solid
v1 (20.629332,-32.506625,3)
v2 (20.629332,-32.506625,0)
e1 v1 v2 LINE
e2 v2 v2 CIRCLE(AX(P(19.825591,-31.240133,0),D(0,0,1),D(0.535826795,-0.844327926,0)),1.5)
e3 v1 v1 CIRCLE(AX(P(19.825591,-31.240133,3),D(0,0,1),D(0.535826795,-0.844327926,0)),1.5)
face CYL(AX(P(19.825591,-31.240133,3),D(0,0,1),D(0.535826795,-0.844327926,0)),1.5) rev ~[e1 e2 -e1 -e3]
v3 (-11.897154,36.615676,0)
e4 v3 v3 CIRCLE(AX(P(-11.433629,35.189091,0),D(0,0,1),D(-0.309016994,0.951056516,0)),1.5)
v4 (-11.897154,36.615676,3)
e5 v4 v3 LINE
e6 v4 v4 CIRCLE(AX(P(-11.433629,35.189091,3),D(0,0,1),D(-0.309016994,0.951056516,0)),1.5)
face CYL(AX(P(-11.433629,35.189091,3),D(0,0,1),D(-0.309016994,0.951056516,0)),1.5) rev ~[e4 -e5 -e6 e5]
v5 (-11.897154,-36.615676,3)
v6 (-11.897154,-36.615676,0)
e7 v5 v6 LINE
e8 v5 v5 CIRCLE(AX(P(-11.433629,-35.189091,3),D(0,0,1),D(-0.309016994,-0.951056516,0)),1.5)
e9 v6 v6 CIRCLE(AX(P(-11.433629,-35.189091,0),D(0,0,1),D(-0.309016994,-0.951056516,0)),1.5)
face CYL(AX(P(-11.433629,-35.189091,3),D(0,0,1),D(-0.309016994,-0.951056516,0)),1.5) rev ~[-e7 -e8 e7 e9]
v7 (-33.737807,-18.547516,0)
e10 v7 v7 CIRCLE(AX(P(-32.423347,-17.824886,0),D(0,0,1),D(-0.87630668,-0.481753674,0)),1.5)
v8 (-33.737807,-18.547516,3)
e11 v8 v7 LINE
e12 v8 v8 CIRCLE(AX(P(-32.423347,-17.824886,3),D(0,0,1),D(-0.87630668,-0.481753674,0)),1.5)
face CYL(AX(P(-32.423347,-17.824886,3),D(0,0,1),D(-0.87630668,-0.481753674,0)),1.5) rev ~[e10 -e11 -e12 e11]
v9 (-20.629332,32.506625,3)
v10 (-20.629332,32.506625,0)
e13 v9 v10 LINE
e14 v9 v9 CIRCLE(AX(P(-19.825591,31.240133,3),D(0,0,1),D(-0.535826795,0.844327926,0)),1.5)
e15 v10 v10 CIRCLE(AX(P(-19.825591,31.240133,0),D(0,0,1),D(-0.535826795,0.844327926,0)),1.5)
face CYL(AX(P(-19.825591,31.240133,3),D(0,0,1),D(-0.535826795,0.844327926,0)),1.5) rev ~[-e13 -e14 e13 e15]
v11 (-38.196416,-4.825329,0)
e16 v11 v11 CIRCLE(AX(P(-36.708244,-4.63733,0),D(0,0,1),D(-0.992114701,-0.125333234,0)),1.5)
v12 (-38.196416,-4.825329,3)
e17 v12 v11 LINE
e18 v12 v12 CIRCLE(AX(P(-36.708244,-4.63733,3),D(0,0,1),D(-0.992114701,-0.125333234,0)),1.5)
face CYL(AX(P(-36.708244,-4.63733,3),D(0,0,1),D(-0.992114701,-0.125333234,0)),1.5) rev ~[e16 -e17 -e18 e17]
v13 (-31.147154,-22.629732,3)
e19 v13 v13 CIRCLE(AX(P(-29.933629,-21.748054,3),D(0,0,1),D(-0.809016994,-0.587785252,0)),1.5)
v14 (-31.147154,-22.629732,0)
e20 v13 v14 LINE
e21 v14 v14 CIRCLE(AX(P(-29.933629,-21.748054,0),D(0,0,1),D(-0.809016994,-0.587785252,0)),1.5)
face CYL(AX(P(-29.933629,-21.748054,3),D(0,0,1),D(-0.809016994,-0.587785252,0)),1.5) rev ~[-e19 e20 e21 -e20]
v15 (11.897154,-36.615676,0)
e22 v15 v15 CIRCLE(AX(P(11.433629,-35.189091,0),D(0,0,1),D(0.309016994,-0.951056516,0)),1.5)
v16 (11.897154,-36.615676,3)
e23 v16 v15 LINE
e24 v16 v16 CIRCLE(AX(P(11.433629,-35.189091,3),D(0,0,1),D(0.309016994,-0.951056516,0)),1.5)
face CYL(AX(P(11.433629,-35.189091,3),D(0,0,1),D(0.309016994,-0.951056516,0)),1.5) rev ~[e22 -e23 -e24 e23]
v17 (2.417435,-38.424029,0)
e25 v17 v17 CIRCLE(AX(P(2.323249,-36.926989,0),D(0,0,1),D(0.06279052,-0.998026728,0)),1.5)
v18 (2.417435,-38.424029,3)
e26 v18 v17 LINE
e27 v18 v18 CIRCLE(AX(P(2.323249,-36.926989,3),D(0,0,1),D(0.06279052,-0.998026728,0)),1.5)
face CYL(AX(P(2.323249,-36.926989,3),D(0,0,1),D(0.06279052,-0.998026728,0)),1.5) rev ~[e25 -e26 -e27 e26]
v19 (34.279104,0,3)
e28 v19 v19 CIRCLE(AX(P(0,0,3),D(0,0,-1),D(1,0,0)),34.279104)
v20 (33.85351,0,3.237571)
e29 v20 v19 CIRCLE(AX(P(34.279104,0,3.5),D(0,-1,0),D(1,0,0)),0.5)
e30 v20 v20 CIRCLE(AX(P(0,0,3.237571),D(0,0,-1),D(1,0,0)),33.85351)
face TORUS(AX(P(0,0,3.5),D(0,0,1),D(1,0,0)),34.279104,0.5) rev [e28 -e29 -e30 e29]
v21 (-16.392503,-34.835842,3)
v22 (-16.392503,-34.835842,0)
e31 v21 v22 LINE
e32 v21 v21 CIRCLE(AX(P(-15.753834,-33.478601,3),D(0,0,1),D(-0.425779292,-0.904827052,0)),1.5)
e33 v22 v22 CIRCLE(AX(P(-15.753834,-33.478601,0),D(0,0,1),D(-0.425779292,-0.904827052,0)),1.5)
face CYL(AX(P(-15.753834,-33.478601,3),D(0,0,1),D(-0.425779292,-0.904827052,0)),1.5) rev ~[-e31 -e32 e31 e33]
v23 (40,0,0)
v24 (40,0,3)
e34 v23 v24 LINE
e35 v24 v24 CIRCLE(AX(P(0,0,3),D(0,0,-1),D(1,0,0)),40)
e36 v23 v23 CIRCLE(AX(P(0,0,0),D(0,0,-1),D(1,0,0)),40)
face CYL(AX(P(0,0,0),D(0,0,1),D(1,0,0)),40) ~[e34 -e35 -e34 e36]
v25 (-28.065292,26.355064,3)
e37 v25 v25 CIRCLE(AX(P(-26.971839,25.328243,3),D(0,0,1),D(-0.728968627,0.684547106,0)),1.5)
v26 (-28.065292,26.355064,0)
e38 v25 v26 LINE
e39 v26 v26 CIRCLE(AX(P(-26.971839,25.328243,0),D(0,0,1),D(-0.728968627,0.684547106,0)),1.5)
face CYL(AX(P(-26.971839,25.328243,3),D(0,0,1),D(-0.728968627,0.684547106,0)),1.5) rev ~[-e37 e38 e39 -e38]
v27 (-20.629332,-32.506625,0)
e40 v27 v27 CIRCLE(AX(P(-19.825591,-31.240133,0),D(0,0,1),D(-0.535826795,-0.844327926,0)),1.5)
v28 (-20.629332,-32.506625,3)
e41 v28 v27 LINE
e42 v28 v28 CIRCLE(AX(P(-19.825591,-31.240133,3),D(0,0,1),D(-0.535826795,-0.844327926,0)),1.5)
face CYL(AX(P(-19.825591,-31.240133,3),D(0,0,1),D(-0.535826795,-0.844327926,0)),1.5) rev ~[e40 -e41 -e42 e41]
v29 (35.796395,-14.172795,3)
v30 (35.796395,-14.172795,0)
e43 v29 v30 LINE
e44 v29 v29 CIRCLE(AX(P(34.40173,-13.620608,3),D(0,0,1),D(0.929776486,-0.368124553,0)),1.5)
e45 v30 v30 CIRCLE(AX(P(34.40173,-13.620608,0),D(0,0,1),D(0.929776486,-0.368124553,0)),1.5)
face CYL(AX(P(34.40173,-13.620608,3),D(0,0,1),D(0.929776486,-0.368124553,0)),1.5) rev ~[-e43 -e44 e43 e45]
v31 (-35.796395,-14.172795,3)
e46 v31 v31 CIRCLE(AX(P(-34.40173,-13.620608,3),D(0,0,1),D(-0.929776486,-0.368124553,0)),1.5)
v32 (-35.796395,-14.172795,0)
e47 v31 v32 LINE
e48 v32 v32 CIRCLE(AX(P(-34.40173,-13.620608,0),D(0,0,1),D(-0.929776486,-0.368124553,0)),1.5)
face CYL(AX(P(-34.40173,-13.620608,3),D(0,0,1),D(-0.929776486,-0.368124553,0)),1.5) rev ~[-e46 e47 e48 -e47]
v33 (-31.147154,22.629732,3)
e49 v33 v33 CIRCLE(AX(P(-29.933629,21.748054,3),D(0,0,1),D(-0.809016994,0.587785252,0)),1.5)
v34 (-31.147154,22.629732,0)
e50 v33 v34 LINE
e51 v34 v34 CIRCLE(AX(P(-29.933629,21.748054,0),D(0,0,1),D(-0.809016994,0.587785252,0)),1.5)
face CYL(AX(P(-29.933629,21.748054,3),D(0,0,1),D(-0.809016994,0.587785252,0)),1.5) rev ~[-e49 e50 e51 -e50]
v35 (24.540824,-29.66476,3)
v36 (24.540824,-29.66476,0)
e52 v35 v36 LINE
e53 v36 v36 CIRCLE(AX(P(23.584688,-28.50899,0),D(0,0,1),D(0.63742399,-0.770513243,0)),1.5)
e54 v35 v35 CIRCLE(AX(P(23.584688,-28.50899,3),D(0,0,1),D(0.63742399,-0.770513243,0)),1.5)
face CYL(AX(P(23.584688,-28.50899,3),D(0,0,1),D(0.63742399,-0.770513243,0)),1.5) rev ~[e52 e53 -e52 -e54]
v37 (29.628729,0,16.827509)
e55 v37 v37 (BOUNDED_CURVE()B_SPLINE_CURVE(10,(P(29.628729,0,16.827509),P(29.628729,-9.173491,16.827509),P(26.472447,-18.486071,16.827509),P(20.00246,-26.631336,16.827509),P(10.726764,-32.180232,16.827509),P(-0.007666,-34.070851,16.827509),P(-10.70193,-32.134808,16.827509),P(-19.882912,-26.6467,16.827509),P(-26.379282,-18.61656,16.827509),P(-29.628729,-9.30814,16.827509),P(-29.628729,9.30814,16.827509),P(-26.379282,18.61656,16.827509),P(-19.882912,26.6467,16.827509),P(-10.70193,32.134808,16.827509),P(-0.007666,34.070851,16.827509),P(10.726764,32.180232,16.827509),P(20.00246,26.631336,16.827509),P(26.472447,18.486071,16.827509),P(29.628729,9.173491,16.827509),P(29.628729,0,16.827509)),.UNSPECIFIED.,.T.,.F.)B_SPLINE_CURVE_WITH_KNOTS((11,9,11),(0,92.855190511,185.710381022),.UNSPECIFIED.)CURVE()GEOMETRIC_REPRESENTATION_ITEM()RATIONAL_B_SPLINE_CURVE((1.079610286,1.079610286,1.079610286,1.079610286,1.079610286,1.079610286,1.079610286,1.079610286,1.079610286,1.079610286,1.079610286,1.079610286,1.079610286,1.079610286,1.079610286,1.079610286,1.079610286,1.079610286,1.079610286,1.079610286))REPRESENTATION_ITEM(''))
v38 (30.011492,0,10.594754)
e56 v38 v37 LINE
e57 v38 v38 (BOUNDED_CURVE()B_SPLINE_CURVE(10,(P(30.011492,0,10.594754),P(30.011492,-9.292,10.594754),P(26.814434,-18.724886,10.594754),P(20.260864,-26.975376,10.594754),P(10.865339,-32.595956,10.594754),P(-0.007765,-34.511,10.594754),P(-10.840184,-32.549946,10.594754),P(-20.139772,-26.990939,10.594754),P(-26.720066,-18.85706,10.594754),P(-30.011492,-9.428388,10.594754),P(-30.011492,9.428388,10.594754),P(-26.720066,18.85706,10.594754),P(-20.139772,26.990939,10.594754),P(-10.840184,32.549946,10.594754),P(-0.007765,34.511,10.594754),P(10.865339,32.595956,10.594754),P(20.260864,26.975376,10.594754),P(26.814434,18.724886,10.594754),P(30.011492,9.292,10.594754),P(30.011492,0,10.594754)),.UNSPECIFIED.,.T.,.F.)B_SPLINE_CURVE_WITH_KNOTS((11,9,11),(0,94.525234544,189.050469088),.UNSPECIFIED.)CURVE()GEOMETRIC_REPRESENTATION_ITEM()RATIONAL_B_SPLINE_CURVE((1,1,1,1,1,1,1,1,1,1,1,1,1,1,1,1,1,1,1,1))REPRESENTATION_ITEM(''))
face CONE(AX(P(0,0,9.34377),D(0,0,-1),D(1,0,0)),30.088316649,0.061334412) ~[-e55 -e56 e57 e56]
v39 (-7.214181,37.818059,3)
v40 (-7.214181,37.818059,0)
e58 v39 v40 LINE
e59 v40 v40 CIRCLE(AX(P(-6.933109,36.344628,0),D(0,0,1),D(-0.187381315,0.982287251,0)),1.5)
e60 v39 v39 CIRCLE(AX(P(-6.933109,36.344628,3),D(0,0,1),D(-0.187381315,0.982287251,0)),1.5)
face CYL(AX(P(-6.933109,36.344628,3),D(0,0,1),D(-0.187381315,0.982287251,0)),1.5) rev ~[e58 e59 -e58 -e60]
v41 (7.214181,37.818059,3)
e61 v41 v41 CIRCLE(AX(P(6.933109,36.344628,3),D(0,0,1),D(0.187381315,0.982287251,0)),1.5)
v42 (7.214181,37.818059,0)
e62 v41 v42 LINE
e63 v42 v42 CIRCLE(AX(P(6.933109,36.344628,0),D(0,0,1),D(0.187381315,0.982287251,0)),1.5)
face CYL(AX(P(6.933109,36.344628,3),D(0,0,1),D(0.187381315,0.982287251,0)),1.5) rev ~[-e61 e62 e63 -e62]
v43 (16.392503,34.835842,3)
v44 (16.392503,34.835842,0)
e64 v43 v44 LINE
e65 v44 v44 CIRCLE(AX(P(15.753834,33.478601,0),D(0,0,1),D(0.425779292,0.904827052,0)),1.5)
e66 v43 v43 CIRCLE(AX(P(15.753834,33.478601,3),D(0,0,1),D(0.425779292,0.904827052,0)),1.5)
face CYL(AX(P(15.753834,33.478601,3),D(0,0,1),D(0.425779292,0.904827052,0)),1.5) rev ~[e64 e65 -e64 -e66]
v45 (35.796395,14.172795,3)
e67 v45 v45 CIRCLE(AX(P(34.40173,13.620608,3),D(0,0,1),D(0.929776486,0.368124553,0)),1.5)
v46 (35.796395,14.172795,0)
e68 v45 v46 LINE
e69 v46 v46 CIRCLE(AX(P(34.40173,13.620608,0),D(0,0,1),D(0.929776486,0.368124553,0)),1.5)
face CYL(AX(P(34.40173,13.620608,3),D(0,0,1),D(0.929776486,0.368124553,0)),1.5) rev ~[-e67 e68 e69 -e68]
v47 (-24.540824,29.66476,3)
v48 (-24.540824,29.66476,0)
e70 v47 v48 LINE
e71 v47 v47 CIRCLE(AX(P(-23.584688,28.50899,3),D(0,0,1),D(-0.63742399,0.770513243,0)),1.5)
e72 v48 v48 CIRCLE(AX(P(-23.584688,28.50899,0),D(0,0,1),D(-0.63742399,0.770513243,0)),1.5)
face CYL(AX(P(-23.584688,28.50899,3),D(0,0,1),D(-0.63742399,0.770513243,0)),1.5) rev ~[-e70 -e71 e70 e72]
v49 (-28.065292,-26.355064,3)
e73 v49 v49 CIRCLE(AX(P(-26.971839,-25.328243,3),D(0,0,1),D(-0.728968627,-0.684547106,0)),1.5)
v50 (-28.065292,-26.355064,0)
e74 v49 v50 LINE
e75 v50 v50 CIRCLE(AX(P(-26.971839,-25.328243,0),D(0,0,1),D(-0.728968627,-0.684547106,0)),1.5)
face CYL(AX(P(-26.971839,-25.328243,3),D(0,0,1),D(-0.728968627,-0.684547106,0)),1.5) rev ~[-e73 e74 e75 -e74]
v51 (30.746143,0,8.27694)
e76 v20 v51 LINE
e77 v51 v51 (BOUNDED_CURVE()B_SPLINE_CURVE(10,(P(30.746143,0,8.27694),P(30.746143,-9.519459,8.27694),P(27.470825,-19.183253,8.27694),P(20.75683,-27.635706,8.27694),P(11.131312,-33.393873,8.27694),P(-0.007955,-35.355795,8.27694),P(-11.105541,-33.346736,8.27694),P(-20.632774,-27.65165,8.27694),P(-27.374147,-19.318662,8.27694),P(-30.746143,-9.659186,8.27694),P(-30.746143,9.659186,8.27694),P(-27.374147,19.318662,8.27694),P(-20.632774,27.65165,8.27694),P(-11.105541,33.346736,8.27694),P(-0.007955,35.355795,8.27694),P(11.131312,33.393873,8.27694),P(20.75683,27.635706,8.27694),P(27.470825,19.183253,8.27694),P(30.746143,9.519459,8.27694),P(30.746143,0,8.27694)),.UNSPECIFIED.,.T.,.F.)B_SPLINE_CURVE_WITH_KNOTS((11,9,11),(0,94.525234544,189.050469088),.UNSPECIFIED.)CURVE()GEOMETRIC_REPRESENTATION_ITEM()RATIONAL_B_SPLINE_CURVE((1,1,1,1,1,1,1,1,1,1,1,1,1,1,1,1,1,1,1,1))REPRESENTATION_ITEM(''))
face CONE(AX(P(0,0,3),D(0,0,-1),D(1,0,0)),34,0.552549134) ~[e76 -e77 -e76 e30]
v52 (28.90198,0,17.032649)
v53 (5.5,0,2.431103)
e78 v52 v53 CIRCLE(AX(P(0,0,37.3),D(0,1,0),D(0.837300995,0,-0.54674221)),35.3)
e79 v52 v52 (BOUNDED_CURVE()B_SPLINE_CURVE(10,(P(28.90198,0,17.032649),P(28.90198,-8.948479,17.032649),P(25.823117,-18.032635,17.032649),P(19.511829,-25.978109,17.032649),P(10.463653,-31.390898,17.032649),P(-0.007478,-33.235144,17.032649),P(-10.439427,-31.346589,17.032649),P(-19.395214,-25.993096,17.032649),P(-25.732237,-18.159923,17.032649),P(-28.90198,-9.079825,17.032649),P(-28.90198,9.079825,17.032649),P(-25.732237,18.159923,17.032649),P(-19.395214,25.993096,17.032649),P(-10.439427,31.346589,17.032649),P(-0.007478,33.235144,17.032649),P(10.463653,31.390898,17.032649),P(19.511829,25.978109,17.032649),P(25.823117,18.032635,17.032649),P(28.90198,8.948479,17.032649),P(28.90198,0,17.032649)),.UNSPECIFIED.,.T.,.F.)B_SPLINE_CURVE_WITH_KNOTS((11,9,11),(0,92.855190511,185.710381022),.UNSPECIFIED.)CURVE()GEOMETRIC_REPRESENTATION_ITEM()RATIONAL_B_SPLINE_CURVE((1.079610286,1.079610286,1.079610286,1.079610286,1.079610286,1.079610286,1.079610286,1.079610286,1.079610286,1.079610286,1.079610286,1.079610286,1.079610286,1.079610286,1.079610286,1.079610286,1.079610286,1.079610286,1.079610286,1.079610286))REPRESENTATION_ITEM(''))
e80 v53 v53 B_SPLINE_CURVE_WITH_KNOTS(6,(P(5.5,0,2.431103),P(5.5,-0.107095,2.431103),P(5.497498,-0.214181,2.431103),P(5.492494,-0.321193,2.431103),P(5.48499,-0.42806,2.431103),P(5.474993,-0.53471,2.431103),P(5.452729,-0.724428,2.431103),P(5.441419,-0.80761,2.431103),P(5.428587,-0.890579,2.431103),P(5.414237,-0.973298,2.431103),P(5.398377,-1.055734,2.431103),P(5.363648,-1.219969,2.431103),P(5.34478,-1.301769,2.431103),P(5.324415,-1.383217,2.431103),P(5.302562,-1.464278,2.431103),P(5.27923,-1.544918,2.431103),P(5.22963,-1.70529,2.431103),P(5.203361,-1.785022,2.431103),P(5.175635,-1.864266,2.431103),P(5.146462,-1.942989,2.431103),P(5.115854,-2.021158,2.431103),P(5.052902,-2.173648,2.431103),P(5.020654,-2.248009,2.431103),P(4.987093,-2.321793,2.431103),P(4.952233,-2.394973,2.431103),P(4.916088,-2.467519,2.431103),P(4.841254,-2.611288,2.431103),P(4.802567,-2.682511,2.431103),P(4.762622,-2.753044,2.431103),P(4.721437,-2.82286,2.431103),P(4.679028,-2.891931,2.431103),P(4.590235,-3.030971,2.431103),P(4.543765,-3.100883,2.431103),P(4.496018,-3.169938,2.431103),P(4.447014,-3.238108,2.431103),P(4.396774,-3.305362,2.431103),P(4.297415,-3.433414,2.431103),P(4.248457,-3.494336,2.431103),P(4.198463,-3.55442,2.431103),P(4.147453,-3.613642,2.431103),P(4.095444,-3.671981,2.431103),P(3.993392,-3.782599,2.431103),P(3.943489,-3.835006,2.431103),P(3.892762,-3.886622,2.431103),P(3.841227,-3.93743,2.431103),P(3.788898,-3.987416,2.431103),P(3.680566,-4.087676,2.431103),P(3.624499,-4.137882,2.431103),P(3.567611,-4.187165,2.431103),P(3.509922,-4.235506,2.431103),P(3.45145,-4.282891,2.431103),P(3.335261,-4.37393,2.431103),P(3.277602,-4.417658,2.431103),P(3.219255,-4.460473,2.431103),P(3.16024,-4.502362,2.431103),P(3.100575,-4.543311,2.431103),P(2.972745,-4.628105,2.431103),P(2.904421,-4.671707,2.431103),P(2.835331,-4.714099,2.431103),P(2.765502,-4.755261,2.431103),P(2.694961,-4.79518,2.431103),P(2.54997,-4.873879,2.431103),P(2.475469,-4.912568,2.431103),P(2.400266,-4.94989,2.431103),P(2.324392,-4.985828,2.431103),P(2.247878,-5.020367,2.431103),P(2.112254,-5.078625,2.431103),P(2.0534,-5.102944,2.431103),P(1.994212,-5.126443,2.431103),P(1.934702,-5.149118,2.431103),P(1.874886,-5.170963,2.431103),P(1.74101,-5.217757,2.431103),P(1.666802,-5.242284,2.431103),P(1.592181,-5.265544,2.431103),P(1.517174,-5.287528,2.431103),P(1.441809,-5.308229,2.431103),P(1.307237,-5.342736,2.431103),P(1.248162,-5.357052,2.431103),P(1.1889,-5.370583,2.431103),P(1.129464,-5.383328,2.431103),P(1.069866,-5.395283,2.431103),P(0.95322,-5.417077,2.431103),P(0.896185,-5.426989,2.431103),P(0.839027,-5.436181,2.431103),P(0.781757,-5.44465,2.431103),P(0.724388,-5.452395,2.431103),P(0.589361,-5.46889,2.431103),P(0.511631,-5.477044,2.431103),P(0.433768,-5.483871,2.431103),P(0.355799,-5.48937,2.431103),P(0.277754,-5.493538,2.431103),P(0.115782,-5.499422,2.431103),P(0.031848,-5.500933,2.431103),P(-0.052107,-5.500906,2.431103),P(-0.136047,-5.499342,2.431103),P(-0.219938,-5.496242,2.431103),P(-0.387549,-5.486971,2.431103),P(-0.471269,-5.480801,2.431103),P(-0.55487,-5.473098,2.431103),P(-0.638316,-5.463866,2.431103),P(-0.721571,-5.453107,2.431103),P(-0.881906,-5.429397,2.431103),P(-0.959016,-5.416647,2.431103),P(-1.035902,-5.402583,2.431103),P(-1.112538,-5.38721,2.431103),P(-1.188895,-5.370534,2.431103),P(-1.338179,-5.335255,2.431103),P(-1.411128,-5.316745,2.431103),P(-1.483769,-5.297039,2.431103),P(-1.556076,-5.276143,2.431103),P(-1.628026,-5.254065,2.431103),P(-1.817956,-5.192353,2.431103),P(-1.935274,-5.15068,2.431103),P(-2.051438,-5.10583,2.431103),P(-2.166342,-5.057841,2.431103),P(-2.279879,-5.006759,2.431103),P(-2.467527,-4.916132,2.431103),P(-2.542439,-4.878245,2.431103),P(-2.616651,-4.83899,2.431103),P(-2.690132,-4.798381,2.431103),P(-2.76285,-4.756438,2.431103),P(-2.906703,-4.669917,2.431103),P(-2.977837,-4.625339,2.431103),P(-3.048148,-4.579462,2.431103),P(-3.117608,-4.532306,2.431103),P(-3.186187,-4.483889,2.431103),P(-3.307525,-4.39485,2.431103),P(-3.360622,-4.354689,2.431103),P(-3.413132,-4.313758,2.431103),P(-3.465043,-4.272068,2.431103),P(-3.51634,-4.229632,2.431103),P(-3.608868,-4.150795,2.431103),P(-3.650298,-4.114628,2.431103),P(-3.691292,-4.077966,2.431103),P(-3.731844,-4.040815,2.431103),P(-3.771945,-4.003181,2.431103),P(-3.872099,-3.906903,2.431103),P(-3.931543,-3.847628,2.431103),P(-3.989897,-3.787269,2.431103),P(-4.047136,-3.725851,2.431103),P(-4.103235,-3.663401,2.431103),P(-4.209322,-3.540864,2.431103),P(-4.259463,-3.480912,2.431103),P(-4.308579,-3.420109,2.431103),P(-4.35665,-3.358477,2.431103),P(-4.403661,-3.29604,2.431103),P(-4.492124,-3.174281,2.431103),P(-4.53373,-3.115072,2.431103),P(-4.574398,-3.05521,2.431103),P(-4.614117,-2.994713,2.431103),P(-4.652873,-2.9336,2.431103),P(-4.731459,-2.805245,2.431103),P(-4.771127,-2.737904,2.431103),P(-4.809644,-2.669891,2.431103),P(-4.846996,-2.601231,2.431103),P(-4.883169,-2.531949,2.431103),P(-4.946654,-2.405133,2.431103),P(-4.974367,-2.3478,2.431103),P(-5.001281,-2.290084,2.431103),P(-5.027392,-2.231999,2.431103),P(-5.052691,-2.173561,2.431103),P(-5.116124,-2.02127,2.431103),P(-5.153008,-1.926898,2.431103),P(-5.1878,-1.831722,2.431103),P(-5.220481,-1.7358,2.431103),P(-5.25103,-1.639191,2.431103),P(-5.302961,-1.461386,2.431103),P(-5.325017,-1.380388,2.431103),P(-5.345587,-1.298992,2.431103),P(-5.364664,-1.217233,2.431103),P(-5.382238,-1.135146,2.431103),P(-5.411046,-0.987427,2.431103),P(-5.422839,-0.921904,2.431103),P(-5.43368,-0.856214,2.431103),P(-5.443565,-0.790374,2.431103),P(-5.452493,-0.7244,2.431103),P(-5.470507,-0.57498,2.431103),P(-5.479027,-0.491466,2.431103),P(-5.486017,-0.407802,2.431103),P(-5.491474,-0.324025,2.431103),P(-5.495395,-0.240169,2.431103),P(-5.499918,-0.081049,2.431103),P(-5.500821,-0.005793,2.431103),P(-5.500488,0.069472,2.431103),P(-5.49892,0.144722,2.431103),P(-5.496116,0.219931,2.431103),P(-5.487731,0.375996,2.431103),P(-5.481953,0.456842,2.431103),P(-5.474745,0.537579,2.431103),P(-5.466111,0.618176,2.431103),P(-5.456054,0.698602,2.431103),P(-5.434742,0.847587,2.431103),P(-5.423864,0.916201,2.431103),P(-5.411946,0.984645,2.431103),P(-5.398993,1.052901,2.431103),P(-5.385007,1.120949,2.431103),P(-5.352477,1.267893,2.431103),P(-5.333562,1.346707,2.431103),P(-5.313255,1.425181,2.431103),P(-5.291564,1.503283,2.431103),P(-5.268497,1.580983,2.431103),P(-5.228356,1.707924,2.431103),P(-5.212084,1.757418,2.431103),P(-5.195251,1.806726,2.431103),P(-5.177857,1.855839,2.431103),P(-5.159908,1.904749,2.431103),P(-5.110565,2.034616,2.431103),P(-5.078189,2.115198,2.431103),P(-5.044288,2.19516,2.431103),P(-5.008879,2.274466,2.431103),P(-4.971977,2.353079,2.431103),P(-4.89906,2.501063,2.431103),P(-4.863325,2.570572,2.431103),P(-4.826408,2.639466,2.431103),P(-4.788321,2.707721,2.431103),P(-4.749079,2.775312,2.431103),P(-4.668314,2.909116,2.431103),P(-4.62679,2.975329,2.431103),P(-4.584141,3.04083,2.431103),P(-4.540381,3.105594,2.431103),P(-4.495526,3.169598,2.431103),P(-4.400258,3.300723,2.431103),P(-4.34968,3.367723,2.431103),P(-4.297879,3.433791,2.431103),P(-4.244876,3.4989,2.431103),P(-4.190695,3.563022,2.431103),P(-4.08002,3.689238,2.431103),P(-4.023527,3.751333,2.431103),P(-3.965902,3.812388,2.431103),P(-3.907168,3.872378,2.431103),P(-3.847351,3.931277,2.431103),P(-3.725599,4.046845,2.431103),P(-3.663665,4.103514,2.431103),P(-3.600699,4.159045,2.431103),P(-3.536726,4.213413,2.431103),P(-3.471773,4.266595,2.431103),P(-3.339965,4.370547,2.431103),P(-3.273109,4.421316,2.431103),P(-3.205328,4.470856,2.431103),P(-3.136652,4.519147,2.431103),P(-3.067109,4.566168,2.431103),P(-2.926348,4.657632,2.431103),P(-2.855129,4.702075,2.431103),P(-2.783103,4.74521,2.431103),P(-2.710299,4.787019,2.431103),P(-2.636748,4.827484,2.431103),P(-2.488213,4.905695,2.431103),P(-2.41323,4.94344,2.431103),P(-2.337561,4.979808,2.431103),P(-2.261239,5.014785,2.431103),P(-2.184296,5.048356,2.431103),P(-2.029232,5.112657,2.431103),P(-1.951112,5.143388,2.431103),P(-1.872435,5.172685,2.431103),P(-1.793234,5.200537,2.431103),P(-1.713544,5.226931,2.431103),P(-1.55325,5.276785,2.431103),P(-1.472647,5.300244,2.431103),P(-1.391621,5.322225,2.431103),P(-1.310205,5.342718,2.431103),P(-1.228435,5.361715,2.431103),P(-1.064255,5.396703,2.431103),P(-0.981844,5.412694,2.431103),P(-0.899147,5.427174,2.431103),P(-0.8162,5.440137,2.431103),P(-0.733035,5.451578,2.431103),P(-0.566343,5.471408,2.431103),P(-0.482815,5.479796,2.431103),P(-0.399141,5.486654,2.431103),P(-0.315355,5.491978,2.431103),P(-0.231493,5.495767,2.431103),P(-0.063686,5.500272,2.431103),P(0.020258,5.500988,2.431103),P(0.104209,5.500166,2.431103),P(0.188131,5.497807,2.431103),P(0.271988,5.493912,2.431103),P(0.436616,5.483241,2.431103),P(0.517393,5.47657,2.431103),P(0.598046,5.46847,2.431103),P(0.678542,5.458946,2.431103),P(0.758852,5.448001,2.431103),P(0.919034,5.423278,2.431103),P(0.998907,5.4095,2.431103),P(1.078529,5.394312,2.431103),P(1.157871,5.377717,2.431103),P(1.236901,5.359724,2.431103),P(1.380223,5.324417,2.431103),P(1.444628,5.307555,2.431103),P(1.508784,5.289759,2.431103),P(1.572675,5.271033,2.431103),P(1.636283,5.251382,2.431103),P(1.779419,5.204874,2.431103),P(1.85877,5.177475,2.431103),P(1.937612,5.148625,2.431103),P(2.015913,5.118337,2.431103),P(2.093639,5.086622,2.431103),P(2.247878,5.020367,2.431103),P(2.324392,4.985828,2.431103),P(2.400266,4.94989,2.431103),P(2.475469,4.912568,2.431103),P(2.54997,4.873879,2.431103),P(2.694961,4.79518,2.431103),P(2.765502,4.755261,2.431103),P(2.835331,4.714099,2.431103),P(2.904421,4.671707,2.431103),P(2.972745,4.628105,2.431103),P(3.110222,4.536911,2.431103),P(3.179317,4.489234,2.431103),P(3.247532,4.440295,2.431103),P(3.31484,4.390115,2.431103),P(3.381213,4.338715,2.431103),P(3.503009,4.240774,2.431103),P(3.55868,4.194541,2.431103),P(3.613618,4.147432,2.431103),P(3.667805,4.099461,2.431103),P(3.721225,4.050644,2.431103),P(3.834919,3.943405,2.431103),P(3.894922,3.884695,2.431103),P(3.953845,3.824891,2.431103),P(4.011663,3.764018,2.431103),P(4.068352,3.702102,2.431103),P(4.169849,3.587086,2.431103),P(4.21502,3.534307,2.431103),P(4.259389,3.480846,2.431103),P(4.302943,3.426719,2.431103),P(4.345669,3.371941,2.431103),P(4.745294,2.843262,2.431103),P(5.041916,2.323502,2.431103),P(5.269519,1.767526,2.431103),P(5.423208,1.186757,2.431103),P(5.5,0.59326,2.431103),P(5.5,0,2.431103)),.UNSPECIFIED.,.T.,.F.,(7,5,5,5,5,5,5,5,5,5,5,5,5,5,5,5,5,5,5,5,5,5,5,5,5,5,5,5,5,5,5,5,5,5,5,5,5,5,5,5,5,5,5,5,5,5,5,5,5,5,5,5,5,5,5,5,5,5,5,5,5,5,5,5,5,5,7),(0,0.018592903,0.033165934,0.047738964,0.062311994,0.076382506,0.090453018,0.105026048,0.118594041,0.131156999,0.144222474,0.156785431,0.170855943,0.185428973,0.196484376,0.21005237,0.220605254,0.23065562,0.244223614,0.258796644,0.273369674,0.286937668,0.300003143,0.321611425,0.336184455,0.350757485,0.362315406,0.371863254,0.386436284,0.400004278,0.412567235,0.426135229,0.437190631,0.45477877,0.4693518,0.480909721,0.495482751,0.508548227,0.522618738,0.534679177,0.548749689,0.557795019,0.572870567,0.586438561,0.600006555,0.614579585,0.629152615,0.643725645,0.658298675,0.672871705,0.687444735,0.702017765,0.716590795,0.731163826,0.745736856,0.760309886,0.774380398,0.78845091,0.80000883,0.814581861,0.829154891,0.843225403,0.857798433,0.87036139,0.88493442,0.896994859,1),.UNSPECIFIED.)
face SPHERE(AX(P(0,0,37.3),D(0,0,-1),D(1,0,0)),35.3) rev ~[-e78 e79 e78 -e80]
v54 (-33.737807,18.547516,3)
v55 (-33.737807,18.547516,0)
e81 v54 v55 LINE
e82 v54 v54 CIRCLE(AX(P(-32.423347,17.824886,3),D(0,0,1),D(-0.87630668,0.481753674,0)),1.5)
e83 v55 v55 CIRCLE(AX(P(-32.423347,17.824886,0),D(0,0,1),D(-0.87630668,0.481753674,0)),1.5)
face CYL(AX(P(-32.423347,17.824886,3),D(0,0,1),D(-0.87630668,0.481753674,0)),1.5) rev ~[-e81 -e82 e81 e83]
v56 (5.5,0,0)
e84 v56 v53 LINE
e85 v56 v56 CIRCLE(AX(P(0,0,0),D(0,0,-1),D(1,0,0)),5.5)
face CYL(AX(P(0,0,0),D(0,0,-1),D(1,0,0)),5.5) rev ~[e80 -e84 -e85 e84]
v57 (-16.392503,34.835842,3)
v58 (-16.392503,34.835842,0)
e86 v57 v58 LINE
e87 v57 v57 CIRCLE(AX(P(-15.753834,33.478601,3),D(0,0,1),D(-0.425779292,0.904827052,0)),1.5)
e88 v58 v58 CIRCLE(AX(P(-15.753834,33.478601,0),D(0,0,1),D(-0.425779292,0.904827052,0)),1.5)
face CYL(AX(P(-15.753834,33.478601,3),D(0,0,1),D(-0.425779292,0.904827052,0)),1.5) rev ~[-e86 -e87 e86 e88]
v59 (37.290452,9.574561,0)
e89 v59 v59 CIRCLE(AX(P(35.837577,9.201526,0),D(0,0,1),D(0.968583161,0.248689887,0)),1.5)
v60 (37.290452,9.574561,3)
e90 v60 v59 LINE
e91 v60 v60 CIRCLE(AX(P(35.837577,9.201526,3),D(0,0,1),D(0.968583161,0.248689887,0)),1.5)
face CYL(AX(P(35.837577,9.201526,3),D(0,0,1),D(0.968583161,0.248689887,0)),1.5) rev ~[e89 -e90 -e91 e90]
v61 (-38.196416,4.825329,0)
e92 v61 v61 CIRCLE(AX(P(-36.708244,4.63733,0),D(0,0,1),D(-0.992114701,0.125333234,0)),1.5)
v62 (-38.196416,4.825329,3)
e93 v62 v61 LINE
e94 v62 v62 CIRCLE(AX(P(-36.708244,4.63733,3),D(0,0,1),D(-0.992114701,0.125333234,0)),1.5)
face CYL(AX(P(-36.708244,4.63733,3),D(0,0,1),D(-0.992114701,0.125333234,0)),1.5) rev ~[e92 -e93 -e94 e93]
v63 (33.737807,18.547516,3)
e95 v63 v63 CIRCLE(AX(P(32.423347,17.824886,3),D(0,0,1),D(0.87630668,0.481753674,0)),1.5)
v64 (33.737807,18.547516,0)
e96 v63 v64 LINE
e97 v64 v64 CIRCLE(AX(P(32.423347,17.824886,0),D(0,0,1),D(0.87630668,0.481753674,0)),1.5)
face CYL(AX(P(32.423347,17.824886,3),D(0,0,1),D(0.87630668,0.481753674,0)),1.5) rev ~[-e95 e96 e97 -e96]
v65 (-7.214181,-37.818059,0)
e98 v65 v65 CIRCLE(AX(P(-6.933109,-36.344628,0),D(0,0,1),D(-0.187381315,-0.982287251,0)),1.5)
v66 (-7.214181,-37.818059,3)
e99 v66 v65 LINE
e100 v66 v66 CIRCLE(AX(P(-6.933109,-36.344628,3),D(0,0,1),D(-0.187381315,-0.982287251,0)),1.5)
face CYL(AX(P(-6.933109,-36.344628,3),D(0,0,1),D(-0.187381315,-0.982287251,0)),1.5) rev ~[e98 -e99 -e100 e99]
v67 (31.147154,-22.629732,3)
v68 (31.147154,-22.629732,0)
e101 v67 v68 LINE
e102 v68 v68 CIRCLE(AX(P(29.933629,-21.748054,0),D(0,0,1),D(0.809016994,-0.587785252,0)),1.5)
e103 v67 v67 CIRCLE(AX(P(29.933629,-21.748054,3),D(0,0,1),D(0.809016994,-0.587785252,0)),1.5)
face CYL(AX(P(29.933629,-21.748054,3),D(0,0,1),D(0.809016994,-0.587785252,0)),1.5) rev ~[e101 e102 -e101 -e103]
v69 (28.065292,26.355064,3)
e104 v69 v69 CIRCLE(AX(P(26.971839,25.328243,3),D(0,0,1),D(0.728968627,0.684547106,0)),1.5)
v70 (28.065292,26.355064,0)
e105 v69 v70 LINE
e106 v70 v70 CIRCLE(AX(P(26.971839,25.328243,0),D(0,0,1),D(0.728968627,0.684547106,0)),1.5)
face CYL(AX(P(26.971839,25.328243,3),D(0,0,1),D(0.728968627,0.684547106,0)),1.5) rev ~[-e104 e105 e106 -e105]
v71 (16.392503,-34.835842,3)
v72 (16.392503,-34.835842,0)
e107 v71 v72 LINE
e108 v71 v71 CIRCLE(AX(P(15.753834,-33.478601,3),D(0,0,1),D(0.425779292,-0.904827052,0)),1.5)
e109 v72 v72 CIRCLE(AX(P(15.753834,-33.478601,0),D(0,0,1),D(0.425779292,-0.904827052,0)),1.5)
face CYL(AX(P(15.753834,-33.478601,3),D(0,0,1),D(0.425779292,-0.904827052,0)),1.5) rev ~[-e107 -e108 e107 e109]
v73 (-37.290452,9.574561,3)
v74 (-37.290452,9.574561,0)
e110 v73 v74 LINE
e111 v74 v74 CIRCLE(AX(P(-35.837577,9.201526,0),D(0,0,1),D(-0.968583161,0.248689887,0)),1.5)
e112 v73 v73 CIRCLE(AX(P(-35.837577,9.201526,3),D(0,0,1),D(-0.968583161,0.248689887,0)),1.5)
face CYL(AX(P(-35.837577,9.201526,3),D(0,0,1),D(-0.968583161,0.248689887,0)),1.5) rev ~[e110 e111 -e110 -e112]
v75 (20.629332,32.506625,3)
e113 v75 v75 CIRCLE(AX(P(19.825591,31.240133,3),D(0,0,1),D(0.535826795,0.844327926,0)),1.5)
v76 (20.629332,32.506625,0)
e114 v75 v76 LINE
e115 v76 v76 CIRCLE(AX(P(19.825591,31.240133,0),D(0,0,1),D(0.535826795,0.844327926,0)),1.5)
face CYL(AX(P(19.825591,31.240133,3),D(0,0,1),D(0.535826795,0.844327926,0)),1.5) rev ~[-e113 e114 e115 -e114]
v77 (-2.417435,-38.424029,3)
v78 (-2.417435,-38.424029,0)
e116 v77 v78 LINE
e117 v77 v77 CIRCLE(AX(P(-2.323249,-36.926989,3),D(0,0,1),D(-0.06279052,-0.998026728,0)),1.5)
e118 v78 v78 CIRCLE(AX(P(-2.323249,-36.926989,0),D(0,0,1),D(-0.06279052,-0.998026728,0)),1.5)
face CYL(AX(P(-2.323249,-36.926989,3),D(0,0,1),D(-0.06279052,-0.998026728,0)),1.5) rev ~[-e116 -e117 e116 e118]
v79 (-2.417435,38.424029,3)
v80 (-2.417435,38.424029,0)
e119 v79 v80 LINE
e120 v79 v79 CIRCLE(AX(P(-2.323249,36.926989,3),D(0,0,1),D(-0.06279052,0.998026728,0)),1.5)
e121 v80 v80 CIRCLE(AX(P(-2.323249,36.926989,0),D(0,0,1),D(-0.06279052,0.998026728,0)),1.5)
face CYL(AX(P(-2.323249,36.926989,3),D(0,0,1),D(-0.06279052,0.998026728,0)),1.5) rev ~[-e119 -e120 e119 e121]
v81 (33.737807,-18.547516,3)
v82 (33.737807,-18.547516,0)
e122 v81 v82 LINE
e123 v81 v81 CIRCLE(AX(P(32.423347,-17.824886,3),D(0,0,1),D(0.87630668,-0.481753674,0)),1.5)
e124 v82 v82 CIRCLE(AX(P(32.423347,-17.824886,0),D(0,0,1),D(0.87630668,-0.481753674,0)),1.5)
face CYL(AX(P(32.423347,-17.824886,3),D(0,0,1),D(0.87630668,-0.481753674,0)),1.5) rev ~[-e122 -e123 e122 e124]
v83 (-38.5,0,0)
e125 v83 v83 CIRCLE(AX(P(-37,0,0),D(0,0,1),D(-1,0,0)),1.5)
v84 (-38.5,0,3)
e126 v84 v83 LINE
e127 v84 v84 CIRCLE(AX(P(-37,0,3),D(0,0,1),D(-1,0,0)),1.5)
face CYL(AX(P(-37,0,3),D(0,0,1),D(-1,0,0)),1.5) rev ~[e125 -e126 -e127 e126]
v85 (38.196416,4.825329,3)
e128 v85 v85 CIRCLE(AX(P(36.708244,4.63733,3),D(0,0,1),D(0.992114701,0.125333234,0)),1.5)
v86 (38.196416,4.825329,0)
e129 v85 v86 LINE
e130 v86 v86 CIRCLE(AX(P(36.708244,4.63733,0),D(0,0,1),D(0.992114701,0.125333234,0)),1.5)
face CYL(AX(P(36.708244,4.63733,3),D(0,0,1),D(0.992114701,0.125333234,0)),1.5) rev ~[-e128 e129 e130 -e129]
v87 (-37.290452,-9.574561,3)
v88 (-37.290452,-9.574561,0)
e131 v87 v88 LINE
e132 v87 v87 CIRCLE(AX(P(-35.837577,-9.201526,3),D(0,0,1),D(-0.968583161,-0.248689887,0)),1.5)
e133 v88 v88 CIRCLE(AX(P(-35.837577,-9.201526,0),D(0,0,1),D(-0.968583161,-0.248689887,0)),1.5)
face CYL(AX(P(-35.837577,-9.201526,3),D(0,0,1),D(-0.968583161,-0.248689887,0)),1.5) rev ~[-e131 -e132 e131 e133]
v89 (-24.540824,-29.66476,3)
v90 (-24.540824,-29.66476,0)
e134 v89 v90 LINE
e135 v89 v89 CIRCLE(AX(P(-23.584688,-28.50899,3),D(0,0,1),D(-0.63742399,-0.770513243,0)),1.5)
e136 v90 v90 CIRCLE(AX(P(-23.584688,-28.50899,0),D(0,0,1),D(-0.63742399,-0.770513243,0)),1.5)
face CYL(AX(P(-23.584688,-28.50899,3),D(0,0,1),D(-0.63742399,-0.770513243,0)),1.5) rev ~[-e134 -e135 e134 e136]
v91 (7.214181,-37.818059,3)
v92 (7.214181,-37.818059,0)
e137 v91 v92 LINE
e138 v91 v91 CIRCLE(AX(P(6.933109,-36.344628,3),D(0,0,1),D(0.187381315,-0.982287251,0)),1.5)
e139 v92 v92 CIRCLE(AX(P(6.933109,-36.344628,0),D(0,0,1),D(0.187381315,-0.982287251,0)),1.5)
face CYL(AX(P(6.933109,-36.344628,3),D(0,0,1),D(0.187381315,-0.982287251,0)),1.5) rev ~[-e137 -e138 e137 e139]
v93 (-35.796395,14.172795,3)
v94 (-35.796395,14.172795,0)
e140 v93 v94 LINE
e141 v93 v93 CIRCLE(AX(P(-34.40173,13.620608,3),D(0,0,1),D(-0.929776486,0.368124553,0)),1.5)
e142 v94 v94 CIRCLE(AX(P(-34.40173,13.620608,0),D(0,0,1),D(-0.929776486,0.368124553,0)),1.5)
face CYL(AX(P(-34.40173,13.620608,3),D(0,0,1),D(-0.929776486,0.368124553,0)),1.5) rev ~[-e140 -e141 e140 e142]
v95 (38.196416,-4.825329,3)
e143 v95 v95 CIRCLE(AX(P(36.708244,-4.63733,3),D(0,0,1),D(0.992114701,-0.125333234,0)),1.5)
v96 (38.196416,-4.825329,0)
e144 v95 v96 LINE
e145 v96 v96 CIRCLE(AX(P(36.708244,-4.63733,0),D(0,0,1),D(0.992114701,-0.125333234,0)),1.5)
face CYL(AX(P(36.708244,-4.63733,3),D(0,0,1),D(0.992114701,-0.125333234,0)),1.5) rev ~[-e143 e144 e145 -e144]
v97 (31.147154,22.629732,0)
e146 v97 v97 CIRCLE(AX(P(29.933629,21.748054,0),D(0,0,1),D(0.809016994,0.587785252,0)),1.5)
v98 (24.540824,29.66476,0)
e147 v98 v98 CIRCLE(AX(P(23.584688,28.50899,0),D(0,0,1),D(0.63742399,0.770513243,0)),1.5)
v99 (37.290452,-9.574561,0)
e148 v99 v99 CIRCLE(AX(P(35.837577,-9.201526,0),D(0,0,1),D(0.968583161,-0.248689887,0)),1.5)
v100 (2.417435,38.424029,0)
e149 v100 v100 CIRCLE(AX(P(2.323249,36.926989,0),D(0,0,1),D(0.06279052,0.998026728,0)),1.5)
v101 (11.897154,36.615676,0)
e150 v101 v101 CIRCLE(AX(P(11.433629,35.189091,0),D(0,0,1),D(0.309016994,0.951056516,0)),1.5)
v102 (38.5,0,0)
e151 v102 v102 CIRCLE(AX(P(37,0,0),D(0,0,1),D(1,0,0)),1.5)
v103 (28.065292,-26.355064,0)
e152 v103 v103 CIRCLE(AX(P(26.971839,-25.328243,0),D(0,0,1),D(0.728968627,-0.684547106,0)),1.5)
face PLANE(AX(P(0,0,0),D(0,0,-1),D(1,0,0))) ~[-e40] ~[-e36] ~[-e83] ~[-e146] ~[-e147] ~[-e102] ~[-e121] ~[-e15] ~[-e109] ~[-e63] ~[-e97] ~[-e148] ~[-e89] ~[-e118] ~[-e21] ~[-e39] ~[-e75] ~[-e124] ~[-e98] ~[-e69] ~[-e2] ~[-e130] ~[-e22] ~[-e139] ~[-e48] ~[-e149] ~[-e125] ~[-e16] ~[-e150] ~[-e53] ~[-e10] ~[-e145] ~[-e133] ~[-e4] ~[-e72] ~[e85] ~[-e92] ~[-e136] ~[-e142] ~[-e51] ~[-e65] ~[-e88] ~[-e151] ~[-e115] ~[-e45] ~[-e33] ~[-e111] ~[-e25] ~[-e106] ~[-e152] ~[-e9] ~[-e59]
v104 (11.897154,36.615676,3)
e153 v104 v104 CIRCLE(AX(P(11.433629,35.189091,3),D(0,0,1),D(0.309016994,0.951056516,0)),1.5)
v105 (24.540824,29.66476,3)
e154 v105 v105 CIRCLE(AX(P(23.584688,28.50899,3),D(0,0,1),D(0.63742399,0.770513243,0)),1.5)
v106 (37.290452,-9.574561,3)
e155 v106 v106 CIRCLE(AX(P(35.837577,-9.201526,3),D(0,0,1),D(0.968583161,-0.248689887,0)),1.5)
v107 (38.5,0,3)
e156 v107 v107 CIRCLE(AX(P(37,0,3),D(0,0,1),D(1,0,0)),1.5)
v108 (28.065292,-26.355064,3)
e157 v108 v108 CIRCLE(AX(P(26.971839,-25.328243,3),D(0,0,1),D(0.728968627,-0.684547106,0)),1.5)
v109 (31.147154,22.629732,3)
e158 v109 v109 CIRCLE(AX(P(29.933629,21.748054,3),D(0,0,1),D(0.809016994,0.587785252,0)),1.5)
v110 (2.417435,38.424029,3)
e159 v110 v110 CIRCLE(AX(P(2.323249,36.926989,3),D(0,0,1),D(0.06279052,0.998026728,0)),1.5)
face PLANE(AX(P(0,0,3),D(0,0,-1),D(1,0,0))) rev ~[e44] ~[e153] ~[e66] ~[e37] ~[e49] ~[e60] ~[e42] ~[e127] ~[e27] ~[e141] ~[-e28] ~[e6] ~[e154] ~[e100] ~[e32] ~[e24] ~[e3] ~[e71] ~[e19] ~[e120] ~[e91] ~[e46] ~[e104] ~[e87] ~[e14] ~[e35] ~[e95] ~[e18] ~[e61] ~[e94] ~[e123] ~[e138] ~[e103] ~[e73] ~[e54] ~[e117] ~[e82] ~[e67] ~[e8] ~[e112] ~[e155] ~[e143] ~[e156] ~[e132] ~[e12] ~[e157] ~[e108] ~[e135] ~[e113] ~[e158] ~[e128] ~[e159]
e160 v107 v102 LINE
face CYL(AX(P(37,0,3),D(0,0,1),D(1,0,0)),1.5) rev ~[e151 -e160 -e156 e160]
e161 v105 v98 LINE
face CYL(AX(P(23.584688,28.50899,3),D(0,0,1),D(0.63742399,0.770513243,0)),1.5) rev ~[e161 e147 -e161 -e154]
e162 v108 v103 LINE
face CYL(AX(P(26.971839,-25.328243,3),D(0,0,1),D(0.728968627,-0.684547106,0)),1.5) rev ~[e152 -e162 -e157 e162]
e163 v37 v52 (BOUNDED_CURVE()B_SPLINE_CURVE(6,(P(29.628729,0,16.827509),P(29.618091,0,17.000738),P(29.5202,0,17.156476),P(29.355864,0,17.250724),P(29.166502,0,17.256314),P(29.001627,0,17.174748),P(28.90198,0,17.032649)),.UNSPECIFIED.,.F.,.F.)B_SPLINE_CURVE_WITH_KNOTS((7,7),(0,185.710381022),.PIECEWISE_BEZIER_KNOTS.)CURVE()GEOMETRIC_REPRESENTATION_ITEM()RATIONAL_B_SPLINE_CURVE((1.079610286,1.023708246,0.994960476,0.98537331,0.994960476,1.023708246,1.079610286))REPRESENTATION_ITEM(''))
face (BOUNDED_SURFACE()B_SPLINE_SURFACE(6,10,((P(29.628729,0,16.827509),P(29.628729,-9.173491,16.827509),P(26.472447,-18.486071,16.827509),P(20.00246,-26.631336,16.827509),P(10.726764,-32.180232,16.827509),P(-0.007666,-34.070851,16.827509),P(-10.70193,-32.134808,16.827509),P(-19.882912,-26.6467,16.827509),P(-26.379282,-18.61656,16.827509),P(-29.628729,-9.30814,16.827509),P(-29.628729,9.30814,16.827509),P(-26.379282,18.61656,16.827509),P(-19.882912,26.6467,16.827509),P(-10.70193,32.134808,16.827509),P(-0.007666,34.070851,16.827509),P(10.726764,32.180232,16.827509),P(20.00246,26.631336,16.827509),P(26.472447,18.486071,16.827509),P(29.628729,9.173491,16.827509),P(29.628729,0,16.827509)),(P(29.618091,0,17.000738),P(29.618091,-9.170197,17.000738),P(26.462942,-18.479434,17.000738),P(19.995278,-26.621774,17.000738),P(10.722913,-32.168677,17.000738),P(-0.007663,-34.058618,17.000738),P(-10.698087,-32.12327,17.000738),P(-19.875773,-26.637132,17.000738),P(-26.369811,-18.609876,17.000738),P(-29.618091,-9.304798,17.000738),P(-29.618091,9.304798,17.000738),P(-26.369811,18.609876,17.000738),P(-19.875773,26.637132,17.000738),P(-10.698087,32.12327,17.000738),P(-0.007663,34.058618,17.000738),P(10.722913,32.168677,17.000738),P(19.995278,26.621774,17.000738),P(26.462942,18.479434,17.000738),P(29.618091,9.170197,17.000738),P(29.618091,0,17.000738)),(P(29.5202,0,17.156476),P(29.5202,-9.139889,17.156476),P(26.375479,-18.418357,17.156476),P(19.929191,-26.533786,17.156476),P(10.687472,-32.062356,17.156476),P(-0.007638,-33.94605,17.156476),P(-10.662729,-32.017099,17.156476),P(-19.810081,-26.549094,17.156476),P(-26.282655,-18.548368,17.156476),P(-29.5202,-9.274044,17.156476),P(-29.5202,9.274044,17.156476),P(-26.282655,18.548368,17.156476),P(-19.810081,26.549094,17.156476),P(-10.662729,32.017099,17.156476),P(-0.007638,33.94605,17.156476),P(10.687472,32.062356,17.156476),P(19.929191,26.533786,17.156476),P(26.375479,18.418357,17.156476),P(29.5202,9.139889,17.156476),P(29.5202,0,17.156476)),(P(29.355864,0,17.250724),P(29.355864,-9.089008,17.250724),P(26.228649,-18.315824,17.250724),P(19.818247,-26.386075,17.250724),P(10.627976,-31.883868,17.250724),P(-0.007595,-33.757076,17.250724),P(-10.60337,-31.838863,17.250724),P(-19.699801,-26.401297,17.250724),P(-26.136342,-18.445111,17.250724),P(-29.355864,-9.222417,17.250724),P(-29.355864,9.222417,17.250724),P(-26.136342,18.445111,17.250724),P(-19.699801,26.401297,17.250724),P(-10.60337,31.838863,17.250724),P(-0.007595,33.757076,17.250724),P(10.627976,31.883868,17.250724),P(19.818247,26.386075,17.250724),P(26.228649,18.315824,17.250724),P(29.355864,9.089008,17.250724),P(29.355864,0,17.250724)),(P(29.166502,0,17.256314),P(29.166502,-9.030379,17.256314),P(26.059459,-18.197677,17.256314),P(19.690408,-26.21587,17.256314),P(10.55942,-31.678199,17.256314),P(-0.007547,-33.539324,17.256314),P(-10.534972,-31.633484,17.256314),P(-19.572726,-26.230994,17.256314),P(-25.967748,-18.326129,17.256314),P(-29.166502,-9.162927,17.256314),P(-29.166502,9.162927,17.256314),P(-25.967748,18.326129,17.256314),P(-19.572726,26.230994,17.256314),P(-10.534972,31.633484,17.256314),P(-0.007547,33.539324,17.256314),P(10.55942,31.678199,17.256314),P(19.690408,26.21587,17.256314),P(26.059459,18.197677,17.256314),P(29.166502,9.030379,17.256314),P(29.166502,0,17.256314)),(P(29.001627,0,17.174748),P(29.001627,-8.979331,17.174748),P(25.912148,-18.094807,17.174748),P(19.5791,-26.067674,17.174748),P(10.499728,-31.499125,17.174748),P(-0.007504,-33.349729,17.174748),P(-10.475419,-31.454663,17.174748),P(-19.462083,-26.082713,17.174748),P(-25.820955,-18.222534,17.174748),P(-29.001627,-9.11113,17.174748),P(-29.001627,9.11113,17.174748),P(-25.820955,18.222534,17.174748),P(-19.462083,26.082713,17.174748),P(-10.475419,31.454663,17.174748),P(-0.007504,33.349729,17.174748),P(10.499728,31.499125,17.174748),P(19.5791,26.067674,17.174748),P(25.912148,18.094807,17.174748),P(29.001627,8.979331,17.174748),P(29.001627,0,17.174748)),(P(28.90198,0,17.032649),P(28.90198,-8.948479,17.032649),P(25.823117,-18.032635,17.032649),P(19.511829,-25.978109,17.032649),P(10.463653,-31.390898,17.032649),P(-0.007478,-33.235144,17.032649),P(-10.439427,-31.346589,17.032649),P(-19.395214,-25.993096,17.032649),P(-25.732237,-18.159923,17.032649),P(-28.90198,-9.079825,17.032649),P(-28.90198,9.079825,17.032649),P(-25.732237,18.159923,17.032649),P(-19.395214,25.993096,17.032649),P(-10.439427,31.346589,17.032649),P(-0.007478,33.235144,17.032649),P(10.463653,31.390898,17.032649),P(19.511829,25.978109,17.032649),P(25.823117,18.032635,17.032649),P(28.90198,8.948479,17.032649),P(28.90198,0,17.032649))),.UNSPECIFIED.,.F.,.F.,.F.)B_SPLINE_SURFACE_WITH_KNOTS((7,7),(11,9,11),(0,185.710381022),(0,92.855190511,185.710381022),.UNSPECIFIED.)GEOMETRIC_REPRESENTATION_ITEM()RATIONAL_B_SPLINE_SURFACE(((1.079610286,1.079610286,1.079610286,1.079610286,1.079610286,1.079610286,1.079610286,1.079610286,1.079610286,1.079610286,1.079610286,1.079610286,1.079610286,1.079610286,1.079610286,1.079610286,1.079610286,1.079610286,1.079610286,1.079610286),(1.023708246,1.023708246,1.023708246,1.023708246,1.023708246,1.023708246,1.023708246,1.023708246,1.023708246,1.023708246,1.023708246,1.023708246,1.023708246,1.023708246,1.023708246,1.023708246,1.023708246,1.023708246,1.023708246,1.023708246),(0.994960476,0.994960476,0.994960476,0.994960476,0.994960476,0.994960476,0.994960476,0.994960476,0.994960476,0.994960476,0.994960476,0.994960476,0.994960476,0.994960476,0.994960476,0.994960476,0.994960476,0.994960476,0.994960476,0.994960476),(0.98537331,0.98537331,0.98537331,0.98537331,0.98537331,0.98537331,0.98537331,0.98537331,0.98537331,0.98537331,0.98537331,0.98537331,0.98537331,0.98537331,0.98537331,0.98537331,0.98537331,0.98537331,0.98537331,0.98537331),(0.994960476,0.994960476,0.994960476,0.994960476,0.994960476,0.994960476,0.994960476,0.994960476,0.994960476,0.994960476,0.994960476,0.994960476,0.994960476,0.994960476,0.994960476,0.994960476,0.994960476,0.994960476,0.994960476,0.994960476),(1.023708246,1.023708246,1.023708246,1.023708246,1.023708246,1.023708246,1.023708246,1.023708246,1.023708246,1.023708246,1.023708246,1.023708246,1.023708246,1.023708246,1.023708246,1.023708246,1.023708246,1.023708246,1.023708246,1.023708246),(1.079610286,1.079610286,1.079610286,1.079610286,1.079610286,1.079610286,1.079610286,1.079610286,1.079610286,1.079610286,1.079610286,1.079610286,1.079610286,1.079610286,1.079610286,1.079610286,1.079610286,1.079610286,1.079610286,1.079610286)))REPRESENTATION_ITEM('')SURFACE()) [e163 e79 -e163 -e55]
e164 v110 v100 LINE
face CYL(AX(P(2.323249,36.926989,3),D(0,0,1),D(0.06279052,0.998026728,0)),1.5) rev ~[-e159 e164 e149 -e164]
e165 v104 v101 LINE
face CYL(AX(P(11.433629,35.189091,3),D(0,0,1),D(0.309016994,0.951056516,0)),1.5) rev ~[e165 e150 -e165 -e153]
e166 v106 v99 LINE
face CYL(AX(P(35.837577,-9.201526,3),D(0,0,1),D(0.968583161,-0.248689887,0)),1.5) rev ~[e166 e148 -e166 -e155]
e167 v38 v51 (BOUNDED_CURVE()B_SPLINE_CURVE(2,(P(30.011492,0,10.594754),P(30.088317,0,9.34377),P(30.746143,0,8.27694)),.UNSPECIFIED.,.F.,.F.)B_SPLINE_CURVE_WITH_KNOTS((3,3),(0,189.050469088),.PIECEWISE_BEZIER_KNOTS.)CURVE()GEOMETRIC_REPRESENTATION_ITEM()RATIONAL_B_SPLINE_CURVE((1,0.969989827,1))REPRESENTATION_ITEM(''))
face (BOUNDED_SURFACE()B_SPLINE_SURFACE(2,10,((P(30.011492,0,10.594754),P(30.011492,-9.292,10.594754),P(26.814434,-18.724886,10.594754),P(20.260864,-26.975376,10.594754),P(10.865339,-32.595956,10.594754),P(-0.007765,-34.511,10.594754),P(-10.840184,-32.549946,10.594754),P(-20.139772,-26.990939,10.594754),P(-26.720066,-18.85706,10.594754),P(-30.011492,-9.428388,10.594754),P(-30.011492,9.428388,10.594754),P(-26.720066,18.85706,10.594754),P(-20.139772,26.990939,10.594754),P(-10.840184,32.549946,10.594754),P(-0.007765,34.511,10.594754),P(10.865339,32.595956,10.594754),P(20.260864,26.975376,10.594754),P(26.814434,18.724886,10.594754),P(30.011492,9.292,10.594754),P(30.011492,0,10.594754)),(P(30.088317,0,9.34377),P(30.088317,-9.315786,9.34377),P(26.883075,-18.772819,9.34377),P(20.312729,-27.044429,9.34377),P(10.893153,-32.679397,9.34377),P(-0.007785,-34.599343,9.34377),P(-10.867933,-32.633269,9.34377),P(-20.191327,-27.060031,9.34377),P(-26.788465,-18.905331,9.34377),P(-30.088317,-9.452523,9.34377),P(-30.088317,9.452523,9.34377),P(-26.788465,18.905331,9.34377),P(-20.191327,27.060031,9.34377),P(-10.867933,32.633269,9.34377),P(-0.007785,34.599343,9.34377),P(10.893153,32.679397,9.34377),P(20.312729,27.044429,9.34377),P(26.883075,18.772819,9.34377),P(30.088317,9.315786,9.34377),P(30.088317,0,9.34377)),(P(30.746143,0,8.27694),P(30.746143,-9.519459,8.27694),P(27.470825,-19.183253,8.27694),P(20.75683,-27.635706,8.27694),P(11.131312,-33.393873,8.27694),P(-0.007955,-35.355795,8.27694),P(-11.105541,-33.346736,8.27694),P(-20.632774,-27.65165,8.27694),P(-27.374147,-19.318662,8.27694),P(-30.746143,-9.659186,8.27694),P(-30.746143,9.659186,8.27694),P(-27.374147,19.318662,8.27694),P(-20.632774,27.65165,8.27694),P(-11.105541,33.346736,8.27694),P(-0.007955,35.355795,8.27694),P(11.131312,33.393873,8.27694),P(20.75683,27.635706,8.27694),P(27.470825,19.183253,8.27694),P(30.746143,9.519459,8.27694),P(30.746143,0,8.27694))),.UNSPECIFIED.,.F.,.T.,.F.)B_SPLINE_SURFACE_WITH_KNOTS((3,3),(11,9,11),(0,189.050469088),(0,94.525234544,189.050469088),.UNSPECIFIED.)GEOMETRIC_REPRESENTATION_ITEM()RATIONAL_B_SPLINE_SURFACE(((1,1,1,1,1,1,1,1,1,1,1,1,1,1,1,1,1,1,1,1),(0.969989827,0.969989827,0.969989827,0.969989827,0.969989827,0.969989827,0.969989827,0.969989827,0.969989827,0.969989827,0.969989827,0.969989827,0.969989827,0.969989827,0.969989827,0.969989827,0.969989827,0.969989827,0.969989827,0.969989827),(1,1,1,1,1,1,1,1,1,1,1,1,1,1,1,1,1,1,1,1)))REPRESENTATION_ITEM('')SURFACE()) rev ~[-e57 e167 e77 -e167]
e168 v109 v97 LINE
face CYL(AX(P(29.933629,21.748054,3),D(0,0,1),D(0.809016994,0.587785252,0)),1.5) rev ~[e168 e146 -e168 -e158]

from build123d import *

# Parameters (mm, degrees)
F2_R            = 0.4
F3_R            = 5
F4_R            = 0.5
F5_R            = 5.5
F6_DEPTH        = 2.4321027845
F7_R            = 1.5
F8_DEPTH        = 3
F8_COPIES_COUNT = 50


# Not quite as in the source:
# - a pattern or mirror of a feature is missing from the dataset's text; its kind, count and spacing are read off the source's solid


with BuildPart() as f1:
    # F0 (on Front) → F1 (revolve)
    with BuildSketch(Plane.XZ):
        with BuildLine():
            Line((0, 2), (0, 0))
            Line((0, 0), (40, 0))
            Line((40, 0), (40, 3))
            Line((40, 3), (34, 3))
            Line((34, 3), (30.0883166492, 9.3437703326))
            Line((30.0883166492, 9.3437703326), (29.5567251231, 18))
            ThreePointArc((29.5567251231, 18), (16.8047612301, 6.2566432227), (0, 2))
        make_face()
    revolve(axis=Axis((0, 0, 1), (0, 0, -1)))

    # F2
    f2_edges = [f1.edges().sort_by_distance(p)[0] for p in [
        (-29.556725, 0, 18),
    ]]
    fillet(f2_edges, radius=F2_R)

    # F3
    f3_edges = [f1.edges().sort_by_distance(p)[0] for p in [
        (-30.088317, 0, 9.34377),
    ]]
    fillet(f3_edges, radius=F3_R)

    # F4
    f4_edges = [f1.edges().sort_by_distance(p)[0] for p in [
        (-34, 0, 3),
    ]]
    fillet(f4_edges, radius=F4_R)

    # F5 (on face) → F6 (cut, through all)
    with BuildSketch(Plane(origin=(0, 0, 0), x_dir=(1, 0, 0), z_dir=(0, 0, -1))):
        Circle(F5_R)
    extrude(amount=-F6_DEPTH, mode=Mode.SUBTRACT)

    # F7 (on face) → F8 (cut, through all)
    with BuildSketch(Plane.XY.offset(3)):
        with Locations((37, 0)):
            Circle(F7_R)
    f8 = extrude(amount=-F8_DEPTH, mode=Mode.SUBTRACT)

    # F8_copies: F8 ×50 about axis
    f8_copies_axis = Axis((0, 0, 0), (0, 0, 1))
    for i in range(1, F8_COPIES_COUNT):
        add(f8.rotate(f8_copies_axis, i * 360 / F8_COPIES_COUNT), mode=Mode.SUBTRACT)


solid = f1.part
